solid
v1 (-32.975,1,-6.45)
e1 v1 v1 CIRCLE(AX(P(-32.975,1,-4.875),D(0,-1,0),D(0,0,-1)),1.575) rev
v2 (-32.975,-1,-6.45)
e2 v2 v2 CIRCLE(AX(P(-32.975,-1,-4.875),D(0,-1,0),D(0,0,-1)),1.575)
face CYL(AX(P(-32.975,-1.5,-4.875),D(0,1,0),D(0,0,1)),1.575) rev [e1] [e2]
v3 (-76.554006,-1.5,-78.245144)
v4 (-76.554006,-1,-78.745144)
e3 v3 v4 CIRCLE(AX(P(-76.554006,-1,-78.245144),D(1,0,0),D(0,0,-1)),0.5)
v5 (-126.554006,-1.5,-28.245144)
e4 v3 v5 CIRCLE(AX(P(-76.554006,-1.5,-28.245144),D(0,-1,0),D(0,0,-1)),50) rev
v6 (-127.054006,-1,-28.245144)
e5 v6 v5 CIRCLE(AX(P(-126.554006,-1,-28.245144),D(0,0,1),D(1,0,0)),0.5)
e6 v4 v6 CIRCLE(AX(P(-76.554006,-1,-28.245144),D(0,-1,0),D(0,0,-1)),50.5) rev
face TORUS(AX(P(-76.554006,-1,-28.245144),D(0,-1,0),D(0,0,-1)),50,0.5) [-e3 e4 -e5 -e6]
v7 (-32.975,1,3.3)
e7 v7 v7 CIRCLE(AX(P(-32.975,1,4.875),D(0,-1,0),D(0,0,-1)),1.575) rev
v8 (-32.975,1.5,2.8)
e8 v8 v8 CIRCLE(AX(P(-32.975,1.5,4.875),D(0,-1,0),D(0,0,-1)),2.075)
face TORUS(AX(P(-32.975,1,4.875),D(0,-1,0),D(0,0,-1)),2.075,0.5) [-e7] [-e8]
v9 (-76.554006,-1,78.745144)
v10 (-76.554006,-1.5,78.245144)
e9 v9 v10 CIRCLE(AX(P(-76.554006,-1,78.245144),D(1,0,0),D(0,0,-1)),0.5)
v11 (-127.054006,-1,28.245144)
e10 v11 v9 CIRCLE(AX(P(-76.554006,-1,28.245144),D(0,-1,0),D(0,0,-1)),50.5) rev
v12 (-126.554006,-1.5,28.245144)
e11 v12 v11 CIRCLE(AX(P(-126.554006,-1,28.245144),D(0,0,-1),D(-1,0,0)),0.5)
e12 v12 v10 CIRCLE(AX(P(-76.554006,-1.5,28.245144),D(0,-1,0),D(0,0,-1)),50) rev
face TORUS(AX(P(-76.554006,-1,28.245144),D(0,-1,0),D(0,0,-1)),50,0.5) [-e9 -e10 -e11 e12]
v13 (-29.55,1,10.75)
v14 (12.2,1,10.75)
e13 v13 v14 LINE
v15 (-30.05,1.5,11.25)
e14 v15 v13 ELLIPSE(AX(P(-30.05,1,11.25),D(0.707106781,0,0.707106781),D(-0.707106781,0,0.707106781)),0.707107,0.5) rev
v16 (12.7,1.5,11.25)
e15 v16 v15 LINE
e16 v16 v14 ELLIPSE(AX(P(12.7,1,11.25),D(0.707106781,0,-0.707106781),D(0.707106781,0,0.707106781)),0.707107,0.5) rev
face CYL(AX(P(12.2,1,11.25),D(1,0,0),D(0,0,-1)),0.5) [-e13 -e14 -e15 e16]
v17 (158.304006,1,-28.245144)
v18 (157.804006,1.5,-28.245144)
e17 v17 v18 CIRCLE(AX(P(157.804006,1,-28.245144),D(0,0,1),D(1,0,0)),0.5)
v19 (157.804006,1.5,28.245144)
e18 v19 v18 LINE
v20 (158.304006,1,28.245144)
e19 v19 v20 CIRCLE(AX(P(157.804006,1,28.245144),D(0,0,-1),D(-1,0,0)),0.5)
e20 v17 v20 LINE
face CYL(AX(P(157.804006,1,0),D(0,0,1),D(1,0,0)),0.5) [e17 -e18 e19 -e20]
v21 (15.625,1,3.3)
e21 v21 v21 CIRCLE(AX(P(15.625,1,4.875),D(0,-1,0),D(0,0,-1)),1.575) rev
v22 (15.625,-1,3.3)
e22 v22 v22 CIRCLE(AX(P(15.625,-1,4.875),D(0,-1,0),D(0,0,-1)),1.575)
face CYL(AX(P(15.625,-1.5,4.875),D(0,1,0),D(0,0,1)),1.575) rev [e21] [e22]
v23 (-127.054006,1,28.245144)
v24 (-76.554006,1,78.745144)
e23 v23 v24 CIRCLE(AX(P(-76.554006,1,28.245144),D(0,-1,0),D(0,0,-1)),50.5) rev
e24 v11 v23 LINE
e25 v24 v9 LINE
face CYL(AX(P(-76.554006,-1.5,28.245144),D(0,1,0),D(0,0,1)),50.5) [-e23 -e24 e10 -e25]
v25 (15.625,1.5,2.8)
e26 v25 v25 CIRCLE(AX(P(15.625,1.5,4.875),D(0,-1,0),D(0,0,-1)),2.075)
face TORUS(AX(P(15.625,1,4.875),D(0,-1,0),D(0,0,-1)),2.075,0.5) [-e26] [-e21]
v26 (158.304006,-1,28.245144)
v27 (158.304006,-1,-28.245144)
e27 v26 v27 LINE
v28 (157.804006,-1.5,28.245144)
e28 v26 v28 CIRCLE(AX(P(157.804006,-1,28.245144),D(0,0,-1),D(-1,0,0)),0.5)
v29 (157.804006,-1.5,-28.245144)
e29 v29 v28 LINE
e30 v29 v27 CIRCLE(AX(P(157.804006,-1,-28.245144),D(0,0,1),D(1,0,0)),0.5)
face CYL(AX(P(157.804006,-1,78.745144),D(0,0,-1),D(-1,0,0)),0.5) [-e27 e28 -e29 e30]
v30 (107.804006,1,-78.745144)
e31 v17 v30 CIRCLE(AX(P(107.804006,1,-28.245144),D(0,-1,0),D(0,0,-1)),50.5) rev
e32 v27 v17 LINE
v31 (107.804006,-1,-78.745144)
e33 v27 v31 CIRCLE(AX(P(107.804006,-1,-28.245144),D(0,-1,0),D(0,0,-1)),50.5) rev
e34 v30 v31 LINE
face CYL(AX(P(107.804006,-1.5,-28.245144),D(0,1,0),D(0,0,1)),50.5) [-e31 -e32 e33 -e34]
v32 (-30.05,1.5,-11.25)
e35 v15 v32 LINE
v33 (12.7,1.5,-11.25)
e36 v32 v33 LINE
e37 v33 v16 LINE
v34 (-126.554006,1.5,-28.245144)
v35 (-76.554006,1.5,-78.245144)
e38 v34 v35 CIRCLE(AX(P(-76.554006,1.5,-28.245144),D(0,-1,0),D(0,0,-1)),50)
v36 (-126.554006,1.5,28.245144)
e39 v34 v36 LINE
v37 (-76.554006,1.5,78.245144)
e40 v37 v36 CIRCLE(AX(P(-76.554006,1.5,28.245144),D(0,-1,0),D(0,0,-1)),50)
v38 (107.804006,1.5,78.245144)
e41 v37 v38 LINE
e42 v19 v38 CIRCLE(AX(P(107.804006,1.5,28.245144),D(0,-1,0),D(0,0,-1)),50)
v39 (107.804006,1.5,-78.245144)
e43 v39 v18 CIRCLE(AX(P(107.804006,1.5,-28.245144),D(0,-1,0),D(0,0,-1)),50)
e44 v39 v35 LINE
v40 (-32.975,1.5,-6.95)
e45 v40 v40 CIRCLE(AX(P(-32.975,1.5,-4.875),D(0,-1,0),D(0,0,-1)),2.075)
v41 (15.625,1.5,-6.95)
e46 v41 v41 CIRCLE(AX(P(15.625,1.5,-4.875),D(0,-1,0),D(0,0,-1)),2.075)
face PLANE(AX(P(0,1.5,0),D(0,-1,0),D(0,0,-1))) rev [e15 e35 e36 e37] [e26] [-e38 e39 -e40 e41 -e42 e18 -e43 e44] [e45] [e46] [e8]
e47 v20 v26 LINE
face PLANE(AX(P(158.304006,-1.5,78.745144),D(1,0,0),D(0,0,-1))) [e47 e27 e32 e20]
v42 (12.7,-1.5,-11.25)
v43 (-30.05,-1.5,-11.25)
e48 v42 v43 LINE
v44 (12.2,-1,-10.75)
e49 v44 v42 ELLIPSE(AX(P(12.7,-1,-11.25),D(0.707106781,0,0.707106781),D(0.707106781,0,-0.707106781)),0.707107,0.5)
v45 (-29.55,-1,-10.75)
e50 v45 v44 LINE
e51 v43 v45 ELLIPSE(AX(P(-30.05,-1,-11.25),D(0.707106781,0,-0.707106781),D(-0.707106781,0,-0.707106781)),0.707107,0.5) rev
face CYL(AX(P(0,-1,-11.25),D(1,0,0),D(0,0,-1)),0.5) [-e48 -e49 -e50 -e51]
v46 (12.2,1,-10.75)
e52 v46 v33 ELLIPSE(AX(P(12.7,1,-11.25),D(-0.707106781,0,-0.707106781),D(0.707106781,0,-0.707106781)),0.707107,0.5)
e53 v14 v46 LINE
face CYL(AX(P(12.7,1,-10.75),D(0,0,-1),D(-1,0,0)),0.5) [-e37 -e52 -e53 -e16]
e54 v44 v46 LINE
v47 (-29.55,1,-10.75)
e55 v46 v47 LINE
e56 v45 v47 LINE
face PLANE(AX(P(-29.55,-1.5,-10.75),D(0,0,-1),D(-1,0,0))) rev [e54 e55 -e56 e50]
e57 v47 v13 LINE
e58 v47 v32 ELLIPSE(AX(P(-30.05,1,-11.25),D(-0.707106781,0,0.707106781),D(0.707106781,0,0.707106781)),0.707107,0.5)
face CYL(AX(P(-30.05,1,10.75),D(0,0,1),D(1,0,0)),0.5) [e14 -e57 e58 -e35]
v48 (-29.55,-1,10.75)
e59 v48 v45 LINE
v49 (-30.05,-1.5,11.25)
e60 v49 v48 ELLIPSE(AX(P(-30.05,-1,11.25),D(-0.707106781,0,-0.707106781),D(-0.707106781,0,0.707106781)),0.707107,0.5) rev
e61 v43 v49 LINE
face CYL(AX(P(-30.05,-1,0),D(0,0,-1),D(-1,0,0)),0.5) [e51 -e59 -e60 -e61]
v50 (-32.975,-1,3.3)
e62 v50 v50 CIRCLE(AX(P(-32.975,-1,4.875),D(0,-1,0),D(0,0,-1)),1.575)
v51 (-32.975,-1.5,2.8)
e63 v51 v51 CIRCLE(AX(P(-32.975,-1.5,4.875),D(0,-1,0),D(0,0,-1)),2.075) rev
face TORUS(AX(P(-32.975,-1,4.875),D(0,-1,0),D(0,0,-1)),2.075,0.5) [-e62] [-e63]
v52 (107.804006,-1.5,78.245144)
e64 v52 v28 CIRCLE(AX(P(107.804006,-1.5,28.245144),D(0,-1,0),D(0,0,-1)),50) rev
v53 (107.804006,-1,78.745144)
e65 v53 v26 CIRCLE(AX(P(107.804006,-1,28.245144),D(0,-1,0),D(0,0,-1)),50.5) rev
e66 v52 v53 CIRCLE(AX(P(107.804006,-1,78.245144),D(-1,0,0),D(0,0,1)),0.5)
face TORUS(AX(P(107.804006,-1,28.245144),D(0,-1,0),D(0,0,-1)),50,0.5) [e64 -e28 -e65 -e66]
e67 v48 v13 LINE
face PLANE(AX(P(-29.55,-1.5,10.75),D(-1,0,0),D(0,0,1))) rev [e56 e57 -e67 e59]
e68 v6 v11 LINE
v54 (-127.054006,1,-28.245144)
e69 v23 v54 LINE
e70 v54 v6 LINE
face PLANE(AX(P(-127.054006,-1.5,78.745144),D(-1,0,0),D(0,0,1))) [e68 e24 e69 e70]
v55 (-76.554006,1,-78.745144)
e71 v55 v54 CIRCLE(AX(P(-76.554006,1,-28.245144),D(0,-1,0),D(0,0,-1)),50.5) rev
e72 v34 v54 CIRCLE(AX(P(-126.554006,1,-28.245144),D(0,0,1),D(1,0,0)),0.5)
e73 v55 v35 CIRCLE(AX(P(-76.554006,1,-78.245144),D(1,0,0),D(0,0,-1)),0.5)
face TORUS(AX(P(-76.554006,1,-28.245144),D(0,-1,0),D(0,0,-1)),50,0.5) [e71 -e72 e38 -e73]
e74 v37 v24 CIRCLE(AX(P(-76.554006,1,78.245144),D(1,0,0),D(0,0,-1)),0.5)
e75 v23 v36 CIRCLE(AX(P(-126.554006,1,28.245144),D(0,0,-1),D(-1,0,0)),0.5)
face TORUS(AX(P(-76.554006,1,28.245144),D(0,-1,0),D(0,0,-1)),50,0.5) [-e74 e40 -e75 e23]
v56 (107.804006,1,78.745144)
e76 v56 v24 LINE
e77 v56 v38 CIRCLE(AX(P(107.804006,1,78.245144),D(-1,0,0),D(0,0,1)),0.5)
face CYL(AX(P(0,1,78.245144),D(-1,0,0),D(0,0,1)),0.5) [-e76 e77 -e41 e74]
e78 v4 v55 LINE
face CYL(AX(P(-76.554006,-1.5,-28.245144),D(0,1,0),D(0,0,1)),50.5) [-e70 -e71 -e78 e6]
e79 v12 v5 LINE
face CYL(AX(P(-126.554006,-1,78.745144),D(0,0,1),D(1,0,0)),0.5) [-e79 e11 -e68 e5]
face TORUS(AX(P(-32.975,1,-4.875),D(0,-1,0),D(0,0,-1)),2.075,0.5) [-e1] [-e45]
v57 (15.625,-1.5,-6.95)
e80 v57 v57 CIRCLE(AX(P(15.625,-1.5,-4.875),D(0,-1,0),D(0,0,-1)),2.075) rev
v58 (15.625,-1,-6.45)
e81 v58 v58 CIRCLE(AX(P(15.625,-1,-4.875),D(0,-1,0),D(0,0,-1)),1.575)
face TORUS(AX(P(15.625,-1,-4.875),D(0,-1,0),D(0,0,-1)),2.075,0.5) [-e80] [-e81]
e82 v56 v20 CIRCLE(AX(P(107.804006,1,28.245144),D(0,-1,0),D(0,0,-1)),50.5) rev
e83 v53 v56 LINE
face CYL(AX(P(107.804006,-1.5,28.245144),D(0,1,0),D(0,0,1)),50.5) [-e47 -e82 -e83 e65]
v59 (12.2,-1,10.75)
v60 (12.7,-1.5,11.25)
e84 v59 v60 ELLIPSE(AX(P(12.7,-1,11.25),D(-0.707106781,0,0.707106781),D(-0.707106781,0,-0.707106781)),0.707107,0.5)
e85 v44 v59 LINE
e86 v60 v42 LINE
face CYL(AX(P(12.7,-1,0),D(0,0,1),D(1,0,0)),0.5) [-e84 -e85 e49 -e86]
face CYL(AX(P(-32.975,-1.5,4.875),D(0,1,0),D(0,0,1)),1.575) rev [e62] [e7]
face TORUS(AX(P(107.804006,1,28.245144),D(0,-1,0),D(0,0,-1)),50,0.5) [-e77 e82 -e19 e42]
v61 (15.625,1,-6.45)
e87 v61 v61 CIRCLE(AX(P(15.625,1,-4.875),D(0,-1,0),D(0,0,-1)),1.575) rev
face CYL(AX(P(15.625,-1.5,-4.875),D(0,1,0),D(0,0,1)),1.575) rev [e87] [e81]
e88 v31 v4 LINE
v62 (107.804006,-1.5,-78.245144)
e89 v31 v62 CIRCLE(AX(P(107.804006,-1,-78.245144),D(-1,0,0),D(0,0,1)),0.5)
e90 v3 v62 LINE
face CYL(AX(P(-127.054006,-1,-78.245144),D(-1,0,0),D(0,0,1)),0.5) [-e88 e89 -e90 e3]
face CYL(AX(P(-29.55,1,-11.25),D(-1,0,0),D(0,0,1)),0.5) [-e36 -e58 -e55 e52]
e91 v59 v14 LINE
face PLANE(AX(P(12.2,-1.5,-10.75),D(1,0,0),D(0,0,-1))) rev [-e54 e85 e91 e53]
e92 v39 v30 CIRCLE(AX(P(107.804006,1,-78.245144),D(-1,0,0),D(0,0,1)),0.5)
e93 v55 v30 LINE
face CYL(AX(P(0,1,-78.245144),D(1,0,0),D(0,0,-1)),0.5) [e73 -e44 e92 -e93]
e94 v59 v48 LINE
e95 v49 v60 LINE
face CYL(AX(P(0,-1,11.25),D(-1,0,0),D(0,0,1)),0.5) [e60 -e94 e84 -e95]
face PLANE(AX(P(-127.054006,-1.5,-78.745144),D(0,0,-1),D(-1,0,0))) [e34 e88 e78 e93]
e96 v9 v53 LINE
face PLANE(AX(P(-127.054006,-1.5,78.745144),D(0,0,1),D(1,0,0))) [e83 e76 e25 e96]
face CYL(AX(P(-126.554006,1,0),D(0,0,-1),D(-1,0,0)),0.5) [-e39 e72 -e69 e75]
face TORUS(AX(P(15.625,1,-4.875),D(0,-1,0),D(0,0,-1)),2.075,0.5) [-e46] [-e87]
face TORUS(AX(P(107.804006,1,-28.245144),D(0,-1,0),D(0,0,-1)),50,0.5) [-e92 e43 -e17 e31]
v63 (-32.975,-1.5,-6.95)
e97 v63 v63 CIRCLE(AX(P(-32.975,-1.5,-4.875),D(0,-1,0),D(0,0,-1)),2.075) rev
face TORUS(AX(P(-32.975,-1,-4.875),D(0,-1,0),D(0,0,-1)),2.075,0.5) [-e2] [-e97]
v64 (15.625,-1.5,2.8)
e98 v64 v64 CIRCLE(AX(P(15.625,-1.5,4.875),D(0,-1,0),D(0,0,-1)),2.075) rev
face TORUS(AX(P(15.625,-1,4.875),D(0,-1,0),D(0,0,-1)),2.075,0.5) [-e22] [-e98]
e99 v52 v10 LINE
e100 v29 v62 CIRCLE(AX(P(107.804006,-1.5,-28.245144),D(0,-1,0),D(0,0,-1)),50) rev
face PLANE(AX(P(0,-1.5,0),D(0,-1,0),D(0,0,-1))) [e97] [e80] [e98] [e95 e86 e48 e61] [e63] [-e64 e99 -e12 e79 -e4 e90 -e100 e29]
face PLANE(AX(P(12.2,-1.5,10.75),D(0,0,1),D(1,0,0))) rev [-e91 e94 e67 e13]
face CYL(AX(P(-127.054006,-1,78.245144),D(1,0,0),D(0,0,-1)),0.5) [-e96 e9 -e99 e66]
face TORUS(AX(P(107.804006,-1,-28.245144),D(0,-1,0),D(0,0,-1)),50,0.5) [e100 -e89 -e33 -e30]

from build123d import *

# Parameters (mm, degrees)
SKETCH_1_W      = 285.358012304
SKETCH_1_H      = 157.490287618
SKETCH_1_R      = 1.575
SKETCH_1_W_2    = 41.75
SKETCH_1_H_2    = 21.5
EXTRUDE_1_DEPTH = 3
FILLET_1_R      = 0.5
FILLET_2_R      = 50.5


with BuildPart() as part:
    # 草图1 → 凸台-拉伸1 (new body)
    with BuildSketch(Plane(origin=(0, 1.5, 0), x_dir=(1, 0, 0), z_dir=(0, 1, 0))):
        with Locations((15.625, 0)):
            Rectangle(SKETCH_1_W, SKETCH_1_H)
        with Locations(Location((-32.975, 4.875, 0), (0, 0, 90))):
            Circle(SKETCH_1_R, mode=Mode.SUBTRACT)
        with Locations(Location((-32.975, -4.875, 0), (0, 0, 90))):
            Circle(SKETCH_1_R, mode=Mode.SUBTRACT)
        with Locations(Location((15.625, -4.875, 0), (0, 0, 90))):
            Circle(SKETCH_1_R, mode=Mode.SUBTRACT)
        with Locations(Location((15.625, 4.875, 0), (0, 0, 90))):
            Circle(SKETCH_1_R, mode=Mode.SUBTRACT)
        with Locations((-8.675, 0)):
            Rectangle(SKETCH_1_W_2, SKETCH_1_H_2, mode=Mode.SUBTRACT)
    extrude(amount=-EXTRUDE_1_DEPTH)

    # 圆角1
    fillet_1_edges = [part.edges().sort_by_distance(p)[0] for p in [
        (-127.054006152, -1.5, 0),
        (12.2, -1.5, 0),
        (-8.675, -1.5, 10.75),
        (-29.55, -1.5, 0),
        (-8.675, -1.5, -10.75),
        (12.2, 1.5, 0),
        (15.625, -1.5, 78.745143809),
        (-8.675, 1.5, -10.75),
        (-29.55, 1.5, 0),
        (-8.675, 1.5, 10.75),
        (-32.975, -1.5, -3.3),
        (-32.975, 1.5, -3.3),
        (-32.975, -1.5, 6.45),
        (-32.975, 1.5, 6.45),
        (15.625, -1.5, 6.45),
        (15.625, 1.5, 6.45),
        (15.625, -1.5, -3.3),
        (15.625, 1.5, -3.3),
        (158.304006152, -1.5, 0),
        (15.625, 1.5, 78.745143809),
        (-127.054006152, 1.5, 0),
        (15.625, 1.5, -78.745143809),
        (158.304006152, 1.5, 0),
        (15.625, -1.5, -78.745143809),
    ]]
    fillet(fillet_1_edges, radius=FILLET_1_R)

    # 圆角2
    # the kernel refuses this fillet: 50.5 mm, written as the material it takes off along each edge
    with BuildSketch(Plane(origin=(-76.554006152, 1.5, -28.245143809), x_dir=(0, 0, -1), z_dir=(1, 0, 0))) as fillet_2_piece_1:
        with BuildLine():
            CenterArc((50, -0.5), 0.5, 0, 90)
            Line((50.5, -0.5), (50.5, 0))
            Line((50.5, 0), (50, 0))
        make_face()
    revolve(axis=Axis((-76.554006152, 1.5, -28.245143809), (0, 1, 0)), revolution_arc=90, mode=Mode.SUBTRACT)
    with BuildSketch(Plane(origin=(107.804006152, 1.5, -28.245143809), x_dir=(1, 0, 0), z_dir=(0, 0, 1))) as fillet_2_piece_2:
        with BuildLine():
            CenterArc((50, -0.5), 0.5, 0, 90)
            Line((50.5, -0.5), (50.5, 0))
            Line((50.5, 0), (50, 0))
        make_face()
    revolve(axis=Axis((107.804006152, 1.5, -28.245143809), (0, 1, 0)), revolution_arc=90, mode=Mode.SUBTRACT)
    with BuildSketch(Plane(origin=(-76.554006152, 1.5, 28.245143809), x_dir=(-1, 0, 0), z_dir=(0, 0, -1))) as fillet_2_piece_3:
        with BuildLine():
            CenterArc((50, -0.5), 0.5, 0, 90)
            Line((50.5, -0.5), (50.5, 0))
            Line((50.5, 0), (50, 0))
        make_face()
    revolve(axis=Axis((-76.554006152, 1.5, 28.245143809), (0, 1, 0)), revolution_arc=90, mode=Mode.SUBTRACT)
    with BuildSketch(Plane(origin=(107.804006152, 1.5, 28.245143809), x_dir=(0, 0, 1), z_dir=(-1, 0, 0))) as fillet_2_piece_4:
        with BuildLine():
            CenterArc((50, -0.5), 0.5, 0, 90)
            Line((50.5, -0.5), (50.5, 0))
            Line((50.5, 0), (50, 0))
        make_face()
    revolve(axis=Axis((107.804006152, 1.5, 28.245143809), (0, 1, 0)), revolution_arc=90, mode=Mode.SUBTRACT)
    with BuildSketch(Plane(origin=(107.804006152, -1.5, 28.245143809), x_dir=(1, 0, 0), z_dir=(0, 0, -1))) as fillet_2_piece_5:
        with BuildLine():
            CenterArc((50, -0.5), 0.5, 0, 90)
            Line((50.5, -0.5), (50.5, 0))
            Line((50.5, 0), (50, 0))
        make_face()
    revolve(axis=Axis((107.804006152, -1.5, 28.245143809), (0, -1, 0)), revolution_arc=90, mode=Mode.SUBTRACT)
    with BuildSketch(Plane(origin=(-76.554006152, -1.5, 28.245143809), x_dir=(0, 0, 1), z_dir=(1, 0, 0))) as fillet_2_piece_6:
        with BuildLine():
            CenterArc((50, -0.5), 0.5, 0, 90)
            Line((50.5, -0.5), (50.5, 0))
            Line((50.5, 0), (50, 0))
        make_face()
    revolve(axis=Axis((-76.554006152, -1.5, 28.245143809), (0, -1, 0)), revolution_arc=90, mode=Mode.SUBTRACT)
    with BuildSketch(Plane(origin=(107.804006152, -1.5, -28.245143809), x_dir=(0, 0, -1), z_dir=(-1, 0, 0))) as fillet_2_piece_7:
        with BuildLine():
            CenterArc((50, -0.5), 0.5, 0, 90)
            Line((50.5, -0.5), (50.5, 0))
            Line((50.5, 0), (50, 0))
        make_face()
    revolve(axis=Axis((107.804006152, -1.5, -28.245143809), (0, -1, 0)), revolution_arc=90, mode=Mode.SUBTRACT)
    with BuildSketch(Plane(origin=(-76.554006152, -1.5, -28.245143809), x_dir=(-1, 0, 0), z_dir=(0, 0, 1))) as fillet_2_piece_8:
        with BuildLine():
            CenterArc((50, -0.5), 0.5, 0, 90)
            Line((50.5, -0.5), (50.5, 0))
            Line((50.5, 0), (50, 0))
        make_face()
    revolve(axis=Axis((-76.554006152, -1.5, -28.245143809), (0, -1, 0)), revolution_arc=90, mode=Mode.SUBTRACT)
    with BuildSketch(Plane(origin=(158.304006152, 1.5, -78.745143809), x_dir=(0, 0, 1), z_dir=(0, -1, 0)), Plane(origin=(158.304006152, 1.5, 78.745143809), x_dir=(-1, 0, 0), z_dir=(0, -1, 0))) as fillet_2_piece_9:
        with BuildLine():
            CenterArc((FILLET_2_R, FILLET_2_R), FILLET_2_R, 180, 90)
            Line((0, FILLET_2_R), (0, 0))
            Line((0, 0), (FILLET_2_R, 0))
        make_face()
    extrude(amount=3, mode=Mode.SUBTRACT)
    with BuildSketch(Plane(origin=(-127.054006152, 1.5, -78.745143809), x_dir=(0, 0, 1), z_dir=(0, -1, 0)), Plane(origin=(-127.054006152, 1.5, 78.745143809), x_dir=(1, 0, 0), z_dir=(0, -1, 0))) as fillet_2_piece_10:
        with BuildLine():
            CenterArc((FILLET_2_R, -FILLET_2_R), FILLET_2_R, 90, 90)
            Line((0, -FILLET_2_R), (0, 0))
            Line((0, 0), (FILLET_2_R, 0))
        make_face()
    extrude(amount=3, mode=Mode.SUBTRACT)


solid = part.part
